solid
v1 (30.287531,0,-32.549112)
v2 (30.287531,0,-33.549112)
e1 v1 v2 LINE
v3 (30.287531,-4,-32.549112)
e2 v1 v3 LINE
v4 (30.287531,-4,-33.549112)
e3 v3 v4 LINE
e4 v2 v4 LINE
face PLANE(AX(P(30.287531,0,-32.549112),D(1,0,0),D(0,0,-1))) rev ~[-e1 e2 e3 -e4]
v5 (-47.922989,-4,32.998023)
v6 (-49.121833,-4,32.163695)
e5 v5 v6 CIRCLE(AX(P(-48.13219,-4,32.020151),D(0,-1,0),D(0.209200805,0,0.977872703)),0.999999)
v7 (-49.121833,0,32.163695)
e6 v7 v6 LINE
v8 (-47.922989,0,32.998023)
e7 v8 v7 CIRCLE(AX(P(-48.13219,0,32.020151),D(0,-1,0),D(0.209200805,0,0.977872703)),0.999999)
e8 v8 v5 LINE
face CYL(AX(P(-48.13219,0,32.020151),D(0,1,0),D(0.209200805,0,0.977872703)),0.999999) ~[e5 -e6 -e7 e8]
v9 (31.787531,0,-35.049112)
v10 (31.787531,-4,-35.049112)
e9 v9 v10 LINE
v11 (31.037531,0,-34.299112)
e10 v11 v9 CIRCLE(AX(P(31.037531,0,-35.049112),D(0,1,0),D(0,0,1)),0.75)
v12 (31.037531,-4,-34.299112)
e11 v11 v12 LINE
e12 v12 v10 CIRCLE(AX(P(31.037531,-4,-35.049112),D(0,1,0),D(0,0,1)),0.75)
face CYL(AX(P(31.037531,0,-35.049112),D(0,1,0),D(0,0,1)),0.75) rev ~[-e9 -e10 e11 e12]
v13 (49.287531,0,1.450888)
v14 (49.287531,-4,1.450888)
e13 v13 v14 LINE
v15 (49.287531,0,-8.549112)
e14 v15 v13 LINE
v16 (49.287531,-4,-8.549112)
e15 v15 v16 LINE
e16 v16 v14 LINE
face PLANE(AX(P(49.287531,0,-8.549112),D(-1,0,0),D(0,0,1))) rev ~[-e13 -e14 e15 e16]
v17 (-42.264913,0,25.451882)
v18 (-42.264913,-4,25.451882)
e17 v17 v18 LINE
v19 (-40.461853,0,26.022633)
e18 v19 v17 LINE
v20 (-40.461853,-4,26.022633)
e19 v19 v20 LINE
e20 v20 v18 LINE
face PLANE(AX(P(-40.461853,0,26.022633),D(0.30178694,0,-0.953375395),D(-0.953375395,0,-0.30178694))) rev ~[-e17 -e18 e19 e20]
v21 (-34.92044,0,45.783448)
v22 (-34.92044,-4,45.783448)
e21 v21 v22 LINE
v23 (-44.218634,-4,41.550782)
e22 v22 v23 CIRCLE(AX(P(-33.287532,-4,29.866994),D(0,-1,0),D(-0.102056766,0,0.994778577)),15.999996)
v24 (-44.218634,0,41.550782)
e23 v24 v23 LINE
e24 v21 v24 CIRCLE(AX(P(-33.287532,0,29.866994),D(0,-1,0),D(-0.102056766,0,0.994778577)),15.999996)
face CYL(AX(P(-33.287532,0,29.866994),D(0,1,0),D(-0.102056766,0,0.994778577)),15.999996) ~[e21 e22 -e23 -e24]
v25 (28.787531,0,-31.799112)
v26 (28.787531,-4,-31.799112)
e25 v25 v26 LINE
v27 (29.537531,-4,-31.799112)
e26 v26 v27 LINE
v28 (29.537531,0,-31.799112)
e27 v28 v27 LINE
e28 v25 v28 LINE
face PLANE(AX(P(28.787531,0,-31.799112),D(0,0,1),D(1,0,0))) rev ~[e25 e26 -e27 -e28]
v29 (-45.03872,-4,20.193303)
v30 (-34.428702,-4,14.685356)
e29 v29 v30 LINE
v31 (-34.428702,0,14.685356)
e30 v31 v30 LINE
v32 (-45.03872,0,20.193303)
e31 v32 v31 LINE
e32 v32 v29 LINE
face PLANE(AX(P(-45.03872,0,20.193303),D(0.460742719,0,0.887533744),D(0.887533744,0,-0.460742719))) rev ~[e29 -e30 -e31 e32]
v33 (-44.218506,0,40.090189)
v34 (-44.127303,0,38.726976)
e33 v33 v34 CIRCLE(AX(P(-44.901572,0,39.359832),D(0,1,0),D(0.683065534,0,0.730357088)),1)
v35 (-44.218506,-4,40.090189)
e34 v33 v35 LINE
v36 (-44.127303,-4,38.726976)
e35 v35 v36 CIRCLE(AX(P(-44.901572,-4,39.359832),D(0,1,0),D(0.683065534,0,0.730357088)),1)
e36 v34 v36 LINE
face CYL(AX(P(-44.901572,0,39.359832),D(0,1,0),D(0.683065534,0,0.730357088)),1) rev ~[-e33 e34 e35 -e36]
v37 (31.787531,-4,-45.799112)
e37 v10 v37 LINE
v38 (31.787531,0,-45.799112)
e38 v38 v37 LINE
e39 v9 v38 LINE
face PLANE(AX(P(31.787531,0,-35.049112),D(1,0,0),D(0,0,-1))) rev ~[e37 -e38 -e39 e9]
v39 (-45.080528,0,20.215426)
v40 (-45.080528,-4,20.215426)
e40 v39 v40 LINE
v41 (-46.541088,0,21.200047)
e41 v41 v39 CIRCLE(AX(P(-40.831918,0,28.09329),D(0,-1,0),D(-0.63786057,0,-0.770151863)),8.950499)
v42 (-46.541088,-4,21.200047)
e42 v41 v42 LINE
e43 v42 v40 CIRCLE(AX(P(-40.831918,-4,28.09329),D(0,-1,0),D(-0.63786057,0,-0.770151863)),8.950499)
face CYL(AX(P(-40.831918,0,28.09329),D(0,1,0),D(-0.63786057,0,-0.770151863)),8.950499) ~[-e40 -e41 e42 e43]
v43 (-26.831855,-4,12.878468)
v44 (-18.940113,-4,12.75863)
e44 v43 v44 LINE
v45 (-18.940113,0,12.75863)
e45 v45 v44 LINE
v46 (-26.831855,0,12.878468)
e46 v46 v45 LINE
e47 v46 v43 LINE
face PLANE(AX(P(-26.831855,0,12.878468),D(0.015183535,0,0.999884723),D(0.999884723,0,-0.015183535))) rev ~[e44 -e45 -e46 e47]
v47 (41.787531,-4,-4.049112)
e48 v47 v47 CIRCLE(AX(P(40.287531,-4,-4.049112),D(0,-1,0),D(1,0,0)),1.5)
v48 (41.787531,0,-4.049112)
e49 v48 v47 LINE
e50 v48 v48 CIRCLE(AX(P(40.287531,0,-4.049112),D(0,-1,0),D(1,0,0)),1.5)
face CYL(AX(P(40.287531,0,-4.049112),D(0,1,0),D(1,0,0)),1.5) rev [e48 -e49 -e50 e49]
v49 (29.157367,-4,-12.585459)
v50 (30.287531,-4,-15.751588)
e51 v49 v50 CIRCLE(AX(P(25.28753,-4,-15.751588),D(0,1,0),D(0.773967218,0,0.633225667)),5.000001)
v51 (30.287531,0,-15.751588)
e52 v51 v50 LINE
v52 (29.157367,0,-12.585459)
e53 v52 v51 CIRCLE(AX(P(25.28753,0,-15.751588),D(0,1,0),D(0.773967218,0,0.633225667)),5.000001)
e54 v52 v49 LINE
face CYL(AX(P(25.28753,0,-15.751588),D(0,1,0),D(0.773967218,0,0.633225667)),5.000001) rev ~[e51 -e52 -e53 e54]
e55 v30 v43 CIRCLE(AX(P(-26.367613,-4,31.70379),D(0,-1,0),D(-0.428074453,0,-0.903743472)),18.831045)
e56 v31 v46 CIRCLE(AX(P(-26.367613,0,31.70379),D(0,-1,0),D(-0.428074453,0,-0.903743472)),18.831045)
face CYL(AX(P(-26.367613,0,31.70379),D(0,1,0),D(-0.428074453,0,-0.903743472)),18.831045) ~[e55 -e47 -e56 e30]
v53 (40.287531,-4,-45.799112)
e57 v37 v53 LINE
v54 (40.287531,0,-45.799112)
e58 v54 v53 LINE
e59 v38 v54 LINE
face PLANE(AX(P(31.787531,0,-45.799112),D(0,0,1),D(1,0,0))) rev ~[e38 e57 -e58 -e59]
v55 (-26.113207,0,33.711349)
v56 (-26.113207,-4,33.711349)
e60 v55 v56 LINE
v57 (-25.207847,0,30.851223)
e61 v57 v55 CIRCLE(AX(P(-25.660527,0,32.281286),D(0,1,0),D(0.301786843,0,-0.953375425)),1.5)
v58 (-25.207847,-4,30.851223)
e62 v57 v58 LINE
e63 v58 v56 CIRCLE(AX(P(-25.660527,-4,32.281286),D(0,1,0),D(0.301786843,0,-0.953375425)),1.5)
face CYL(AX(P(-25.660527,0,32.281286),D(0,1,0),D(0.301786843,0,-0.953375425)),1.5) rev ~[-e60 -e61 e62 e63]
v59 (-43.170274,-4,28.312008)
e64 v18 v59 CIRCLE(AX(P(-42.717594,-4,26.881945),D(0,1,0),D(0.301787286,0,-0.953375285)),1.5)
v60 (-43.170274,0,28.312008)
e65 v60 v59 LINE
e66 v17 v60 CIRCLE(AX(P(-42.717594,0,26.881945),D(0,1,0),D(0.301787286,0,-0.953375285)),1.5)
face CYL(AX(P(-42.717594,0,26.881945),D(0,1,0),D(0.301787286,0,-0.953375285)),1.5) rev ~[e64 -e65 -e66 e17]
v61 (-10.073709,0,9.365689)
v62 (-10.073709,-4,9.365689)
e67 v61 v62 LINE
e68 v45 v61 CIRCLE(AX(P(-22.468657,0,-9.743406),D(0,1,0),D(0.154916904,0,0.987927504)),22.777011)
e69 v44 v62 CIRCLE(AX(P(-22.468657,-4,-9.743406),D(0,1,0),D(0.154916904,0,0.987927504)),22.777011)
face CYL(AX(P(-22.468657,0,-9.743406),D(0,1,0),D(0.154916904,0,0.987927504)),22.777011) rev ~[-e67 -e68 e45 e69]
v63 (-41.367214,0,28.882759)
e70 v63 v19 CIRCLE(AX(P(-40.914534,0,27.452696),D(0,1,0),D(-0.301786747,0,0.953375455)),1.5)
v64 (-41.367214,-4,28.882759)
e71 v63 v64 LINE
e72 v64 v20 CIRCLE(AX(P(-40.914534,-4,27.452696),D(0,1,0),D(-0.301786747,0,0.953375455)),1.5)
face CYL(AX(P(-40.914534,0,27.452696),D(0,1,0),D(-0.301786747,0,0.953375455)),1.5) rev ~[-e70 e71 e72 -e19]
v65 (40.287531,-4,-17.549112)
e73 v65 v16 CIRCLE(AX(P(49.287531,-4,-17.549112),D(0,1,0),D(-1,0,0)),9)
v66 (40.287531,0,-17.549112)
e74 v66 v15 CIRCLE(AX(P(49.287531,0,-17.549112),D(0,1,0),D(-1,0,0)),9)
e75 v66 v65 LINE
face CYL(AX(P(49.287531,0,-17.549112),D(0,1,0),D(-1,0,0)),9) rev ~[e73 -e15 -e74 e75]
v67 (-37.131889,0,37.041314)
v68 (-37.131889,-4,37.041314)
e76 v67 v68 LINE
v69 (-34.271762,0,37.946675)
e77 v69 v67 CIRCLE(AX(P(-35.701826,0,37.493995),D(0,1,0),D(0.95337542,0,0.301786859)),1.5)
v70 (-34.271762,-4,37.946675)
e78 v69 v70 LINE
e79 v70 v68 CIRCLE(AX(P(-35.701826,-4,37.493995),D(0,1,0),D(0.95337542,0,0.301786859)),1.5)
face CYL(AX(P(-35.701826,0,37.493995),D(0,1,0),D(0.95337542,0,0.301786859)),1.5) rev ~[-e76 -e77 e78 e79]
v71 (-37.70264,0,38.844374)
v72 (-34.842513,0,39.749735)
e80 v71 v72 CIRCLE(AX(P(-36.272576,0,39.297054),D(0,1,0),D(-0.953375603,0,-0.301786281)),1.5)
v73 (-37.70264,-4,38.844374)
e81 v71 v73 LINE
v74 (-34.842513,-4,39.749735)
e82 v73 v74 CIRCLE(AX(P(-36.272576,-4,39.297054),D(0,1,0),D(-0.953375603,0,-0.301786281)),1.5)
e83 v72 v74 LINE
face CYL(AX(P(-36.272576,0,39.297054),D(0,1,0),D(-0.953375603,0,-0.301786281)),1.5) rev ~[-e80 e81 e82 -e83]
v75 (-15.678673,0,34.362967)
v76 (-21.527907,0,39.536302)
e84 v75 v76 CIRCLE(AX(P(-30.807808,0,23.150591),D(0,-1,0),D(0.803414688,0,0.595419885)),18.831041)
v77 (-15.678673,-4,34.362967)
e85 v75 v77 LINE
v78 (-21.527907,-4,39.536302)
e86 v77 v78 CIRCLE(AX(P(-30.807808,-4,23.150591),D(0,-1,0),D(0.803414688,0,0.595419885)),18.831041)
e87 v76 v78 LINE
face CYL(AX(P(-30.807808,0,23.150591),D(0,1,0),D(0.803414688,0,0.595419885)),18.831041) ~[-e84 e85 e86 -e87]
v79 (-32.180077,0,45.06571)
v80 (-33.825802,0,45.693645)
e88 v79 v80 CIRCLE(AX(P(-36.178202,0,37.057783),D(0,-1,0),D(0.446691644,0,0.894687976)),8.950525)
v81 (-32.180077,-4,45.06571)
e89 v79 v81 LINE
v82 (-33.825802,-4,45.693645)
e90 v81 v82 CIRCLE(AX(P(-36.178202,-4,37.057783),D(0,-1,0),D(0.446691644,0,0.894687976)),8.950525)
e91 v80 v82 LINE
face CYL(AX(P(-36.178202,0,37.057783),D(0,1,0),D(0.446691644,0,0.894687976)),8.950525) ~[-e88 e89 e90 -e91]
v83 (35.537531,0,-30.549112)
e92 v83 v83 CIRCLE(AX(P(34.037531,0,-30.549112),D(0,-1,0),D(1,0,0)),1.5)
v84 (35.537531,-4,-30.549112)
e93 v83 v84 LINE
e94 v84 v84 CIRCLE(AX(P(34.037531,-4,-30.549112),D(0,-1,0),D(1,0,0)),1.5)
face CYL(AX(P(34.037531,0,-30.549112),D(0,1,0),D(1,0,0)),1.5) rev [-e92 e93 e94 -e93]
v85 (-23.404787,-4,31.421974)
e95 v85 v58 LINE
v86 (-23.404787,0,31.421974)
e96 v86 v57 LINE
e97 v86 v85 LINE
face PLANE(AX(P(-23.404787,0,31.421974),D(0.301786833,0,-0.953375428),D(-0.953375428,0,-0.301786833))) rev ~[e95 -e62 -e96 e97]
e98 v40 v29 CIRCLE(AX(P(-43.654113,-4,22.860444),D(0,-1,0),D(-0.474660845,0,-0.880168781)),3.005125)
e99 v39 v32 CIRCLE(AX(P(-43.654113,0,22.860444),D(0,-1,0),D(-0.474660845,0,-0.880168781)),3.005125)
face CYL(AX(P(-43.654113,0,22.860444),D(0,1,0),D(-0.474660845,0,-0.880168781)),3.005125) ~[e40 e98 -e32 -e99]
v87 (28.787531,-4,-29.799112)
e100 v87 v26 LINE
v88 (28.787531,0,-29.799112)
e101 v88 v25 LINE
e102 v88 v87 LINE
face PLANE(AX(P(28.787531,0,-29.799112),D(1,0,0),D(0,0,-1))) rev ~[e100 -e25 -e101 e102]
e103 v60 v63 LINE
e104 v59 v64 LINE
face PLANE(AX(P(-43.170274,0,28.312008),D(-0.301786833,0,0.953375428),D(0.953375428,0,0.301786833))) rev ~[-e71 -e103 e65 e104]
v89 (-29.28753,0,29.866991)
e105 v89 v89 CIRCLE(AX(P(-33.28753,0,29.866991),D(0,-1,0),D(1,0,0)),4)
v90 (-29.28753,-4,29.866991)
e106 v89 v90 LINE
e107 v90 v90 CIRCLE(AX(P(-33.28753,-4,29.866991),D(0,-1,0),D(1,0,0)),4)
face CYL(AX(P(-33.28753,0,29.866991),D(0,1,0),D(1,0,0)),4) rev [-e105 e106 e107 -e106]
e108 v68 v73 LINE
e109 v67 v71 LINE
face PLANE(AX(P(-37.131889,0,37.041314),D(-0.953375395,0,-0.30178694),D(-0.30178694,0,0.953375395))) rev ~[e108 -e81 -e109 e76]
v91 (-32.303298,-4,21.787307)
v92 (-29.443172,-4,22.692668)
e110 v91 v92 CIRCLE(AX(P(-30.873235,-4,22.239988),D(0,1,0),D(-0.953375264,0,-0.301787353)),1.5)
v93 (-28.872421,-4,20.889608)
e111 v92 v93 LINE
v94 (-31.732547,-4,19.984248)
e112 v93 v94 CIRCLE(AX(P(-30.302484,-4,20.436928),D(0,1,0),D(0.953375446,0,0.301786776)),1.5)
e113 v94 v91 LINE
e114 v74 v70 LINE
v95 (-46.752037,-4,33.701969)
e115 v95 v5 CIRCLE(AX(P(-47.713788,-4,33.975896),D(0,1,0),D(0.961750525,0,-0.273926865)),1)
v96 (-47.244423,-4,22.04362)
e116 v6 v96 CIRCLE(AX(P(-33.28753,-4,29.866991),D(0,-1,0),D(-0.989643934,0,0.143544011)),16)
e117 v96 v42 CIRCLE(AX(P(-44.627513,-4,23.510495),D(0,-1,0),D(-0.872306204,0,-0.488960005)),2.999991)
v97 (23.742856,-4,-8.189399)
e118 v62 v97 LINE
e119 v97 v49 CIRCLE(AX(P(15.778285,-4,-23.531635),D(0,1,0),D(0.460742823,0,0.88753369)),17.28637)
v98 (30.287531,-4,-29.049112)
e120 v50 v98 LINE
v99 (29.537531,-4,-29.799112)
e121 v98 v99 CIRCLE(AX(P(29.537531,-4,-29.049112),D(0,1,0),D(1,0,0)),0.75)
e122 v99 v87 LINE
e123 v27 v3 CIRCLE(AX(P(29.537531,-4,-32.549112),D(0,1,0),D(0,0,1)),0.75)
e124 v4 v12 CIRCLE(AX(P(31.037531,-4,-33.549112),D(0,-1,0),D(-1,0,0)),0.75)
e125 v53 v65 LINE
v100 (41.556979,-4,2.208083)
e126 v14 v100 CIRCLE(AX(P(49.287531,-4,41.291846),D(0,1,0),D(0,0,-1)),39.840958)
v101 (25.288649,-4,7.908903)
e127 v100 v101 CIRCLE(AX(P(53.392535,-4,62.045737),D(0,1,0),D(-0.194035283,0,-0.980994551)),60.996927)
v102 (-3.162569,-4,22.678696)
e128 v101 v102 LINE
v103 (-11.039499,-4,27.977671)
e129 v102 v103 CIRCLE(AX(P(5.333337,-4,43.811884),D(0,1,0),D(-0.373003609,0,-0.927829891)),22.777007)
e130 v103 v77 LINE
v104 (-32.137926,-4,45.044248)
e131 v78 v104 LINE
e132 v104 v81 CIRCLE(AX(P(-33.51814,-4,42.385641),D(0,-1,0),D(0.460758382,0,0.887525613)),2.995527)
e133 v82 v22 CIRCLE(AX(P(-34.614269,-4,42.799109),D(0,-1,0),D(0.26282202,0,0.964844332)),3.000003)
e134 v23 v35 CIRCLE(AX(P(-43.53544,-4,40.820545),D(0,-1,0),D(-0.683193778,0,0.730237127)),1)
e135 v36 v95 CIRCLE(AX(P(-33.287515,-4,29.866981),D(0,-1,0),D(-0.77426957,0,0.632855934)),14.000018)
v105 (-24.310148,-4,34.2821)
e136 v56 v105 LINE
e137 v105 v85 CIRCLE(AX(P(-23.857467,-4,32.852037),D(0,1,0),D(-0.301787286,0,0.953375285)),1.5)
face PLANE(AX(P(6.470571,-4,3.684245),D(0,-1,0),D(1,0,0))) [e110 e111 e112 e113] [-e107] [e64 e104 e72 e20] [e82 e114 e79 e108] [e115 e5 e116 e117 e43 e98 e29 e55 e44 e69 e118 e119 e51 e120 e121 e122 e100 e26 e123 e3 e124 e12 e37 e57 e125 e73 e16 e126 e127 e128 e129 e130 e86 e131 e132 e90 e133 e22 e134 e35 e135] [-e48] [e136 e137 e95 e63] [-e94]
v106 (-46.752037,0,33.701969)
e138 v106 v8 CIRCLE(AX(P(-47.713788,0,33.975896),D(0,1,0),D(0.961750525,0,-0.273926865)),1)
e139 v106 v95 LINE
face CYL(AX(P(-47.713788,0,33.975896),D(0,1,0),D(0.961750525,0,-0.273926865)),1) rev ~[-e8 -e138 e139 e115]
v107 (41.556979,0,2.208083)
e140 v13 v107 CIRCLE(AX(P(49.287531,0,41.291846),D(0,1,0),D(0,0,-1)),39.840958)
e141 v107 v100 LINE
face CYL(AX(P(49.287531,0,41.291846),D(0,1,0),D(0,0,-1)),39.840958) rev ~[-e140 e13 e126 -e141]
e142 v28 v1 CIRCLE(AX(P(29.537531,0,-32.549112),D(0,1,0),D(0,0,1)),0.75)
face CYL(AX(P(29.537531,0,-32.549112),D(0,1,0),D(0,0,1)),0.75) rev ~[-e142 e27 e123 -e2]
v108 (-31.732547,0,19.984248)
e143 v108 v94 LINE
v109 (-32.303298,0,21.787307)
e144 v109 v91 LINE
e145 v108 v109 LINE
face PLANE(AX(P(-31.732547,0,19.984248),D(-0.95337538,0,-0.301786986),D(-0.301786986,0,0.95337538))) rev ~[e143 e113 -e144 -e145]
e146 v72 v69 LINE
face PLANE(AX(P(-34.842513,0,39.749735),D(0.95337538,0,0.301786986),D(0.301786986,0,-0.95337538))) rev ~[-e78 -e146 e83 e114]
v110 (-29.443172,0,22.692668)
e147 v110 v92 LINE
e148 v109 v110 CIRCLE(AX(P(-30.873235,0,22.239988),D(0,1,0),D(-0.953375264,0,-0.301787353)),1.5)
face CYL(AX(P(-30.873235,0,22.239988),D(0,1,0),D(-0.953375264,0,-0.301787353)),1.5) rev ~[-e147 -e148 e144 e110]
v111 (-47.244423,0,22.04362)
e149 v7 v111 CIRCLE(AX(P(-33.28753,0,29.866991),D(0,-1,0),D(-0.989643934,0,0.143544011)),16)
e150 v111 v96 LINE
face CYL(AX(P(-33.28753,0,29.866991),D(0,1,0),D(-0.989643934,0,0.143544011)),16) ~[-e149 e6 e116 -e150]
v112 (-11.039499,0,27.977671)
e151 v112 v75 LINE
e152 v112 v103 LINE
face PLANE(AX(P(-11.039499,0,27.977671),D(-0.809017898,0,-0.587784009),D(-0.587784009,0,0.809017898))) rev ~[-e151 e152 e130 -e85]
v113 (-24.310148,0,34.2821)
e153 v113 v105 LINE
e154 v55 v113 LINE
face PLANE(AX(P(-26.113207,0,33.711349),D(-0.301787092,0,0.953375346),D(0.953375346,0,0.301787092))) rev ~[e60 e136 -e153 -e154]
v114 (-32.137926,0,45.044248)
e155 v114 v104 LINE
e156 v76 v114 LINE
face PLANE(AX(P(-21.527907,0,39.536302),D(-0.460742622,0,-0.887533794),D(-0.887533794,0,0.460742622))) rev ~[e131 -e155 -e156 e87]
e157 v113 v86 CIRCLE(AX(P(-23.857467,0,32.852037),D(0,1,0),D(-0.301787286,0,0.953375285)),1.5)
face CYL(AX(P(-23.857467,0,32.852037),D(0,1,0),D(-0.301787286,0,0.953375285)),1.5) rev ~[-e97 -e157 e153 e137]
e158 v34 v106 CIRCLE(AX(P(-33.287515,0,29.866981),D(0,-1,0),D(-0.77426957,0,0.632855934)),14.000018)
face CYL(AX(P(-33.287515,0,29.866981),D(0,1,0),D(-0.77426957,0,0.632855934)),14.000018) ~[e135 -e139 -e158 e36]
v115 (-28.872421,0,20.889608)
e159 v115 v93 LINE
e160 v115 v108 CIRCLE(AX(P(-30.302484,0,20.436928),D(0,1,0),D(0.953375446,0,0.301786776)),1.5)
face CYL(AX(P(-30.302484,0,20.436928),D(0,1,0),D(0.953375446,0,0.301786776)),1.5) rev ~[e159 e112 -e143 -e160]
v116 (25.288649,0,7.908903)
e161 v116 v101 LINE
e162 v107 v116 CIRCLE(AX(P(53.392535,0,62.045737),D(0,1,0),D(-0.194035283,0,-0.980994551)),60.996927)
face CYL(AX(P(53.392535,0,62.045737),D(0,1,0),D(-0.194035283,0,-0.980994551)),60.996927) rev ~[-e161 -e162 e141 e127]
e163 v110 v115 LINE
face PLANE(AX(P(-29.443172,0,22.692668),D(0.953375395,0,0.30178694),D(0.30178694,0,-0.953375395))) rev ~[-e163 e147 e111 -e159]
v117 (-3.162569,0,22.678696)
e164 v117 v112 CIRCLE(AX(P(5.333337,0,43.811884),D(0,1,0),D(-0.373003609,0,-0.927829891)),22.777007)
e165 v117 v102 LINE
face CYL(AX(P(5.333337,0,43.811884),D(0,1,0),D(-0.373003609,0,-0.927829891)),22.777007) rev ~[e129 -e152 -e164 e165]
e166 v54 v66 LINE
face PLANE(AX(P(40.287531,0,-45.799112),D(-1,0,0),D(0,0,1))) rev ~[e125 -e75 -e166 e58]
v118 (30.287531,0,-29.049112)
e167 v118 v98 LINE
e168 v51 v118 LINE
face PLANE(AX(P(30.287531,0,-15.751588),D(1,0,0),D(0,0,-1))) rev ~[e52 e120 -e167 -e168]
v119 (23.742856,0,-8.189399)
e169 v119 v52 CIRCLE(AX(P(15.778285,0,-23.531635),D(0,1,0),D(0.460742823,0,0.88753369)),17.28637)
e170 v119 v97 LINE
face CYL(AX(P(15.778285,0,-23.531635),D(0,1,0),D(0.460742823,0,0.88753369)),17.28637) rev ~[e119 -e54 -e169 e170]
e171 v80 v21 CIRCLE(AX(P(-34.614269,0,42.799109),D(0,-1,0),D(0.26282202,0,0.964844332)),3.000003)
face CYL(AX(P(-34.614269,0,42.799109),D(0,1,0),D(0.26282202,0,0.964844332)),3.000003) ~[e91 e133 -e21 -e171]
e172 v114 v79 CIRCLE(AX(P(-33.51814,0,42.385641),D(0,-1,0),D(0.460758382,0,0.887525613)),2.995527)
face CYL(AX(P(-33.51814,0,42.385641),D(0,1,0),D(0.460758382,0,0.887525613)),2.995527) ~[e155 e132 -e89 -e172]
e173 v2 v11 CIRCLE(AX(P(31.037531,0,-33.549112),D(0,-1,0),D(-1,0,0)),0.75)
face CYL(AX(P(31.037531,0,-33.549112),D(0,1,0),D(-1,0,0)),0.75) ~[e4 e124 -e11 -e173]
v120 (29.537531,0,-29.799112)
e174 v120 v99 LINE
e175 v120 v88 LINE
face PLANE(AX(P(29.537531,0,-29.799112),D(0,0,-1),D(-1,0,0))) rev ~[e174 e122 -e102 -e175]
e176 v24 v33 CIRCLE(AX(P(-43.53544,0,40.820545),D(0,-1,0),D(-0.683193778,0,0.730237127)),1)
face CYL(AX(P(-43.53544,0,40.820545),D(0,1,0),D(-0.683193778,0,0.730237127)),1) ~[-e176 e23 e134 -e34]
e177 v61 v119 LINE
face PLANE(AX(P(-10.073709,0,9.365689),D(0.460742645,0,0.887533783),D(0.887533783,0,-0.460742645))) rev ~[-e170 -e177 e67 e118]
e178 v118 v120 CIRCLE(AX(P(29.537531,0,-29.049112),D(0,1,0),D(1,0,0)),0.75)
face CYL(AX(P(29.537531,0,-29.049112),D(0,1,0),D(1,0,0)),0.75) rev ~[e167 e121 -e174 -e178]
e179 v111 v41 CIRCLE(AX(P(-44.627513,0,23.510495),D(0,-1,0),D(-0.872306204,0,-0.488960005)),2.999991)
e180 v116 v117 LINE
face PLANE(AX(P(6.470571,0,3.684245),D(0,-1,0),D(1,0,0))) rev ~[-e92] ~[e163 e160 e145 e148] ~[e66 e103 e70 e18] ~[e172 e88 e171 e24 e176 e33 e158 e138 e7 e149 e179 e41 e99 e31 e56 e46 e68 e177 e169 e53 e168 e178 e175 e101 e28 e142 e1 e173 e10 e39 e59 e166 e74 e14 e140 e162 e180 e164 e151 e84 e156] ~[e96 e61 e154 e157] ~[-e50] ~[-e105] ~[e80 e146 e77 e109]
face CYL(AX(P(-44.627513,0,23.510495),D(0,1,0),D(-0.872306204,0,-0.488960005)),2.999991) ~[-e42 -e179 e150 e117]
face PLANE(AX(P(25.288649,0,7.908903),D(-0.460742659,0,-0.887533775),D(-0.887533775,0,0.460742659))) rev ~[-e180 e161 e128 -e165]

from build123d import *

# Parameters (mm, degrees)
F0_R     = 1.5
F0_R_2   = 4
F1_DEPTH = 4


# Not quite as in the source:
# - ends of sketch curves that miss each other by under 0.0002 mm in the source are joined


with BuildPart() as f1:
    # F0 (on Front) → F1 (new body)
    with BuildSketch(Plane.XZ):
        with BuildLine():
            ThreePointArc((-46.7520374748, 33.7019691352), (-47.1985525616, 33.1188473182), (-47.9229891353, 32.9980233677))
            ThreePointArc((-47.9229891353, 32.9980233677), (-48.7034151976, 32.8409436846), (-49.1218329373, 32.1636949909))
            ThreePointArc((-49.1218329373, 32.1636949909), (-49.0191167234, 26.9485703376), (-47.2444231086, 22.0436199391))
            ThreePointArc((-47.2444231086, 22.0436199391), (-46.9316892388, 21.5893722277), (-46.5410881725, 21.2000467918))
            ThreePointArc((-46.5410881725, 21.2000467918), (-45.835088561, 20.6717193883), (-45.0805279455, 20.2154261011))
            ThreePointArc((-45.0805279455, 20.2154261011), (-45.0596673609, 20.2042820611), (-45.0387197194, 20.1933025406))
            Line((-45.0387197194, 20.1933025406), (-34.428702, 14.685356))
            ThreePointArc((-34.428702, 14.685356), (-30.7249663127, 13.3838083991), (-26.831855016, 12.8784683528))
            Line((-26.831855016, 12.8784683528), (-18.940113, 12.75863))
            ThreePointArc((-18.940113, 12.75863), (-14.3281771728, 11.5292251091), (-10.0737090286, 9.3656889559))
            Line((-10.0737090286, 9.3656889559), (23.742856, -8.189399))
            ThreePointArc((23.742856, -8.189399), (26.6741197813, -10.1115239367), (29.157366832, -12.5854591375))
            ThreePointArc((29.157366832, -12.5854591375), (29.9965212655, -14.0706922033), (30.287531, -15.751588))
            Line((30.287531, -15.751588), (30.287531, -29.049112))
            ThreePointArc((30.287531, -29.049112), (30.0678610859, -29.5794420859), (29.537531, -29.799112))
            Line((29.537531, -29.799112), (28.787531, -29.799112))
            Line((28.787531, -29.799112), (28.787531, -31.799112))
            Line((28.787531, -31.799112), (29.537531, -31.799112))
            ThreePointArc((29.537531, -31.799112), (30.0678610859, -32.0187819141), (30.287531, -32.549112))
            Line((30.287531, -32.549112), (30.287531, -33.549112))
            ThreePointArc((30.287531, -33.549112), (30.5072009141, -34.0794420859), (31.037531, -34.299112))
            ThreePointArc((31.037531, -34.299112), (31.5678610859, -34.5187819141), (31.787531, -35.049112))
            Line((31.787531, -35.049112), (31.787531, -45.799112))
            Line((31.787531, -45.799112), (40.287531, -45.799112))
            Line((40.287531, -45.799112), (40.287531, -17.549112))
            ThreePointArc((40.287531, -17.549112), (42.9235699693, -11.1851509693), (49.287531, -8.549112))
            Line((49.287531, -8.549112), (49.287531, 1.450888))
            ThreePointArc((49.287531, 1.450888), (45.4037577728, 1.6406387059), (41.5569790733, 2.2080833707))
            ThreePointArc((41.5569790733, 2.2080833707), (33.2204107171, 4.4808989987), (25.2886487268, 7.9089034738))
            Line((25.2886487268, 7.9089034738), (-3.162569, 22.678696))
            ThreePointArc((-3.162569, 22.678696), (-7.380174163, 24.9132414841), (-11.0394989374, 27.9776710605))
            Line((-11.0394989374, 27.9776710605), (-15.678673, 34.362967))
            ThreePointArc((-15.678673, 34.362967), (-18.332187349, 37.2561568684), (-21.5279068846, 39.5363022038))
            Line((-21.5279068846, 39.5363022038), (-32.137926, 45.044248))
            ThreePointArc((-32.137926, 45.044248), (-32.1589591581, 45.0550621571), (-32.1800770412, 45.0657099174))
            ThreePointArc((-32.1800770412, 45.0657099174), (-32.9874548739, 45.4202604433), (-33.8258020362, 45.693644867))
            ThreePointArc((-33.8258020362, 45.693644867), (-34.3689763365, 45.7890671015), (-34.9204399653, 45.7834476614))
            ThreePointArc((-34.9204399653, 45.7834476614), (-39.9164421929, 44.4291859973), (-44.218633855, 41.550781845))
            ThreePointArc((-44.218633855, 41.550781845), (-44.5354399962, 40.8204576148), (-44.2185063254, 40.090188652))
            ThreePointArc((-44.2185063254, 40.090188652), (-43.903802542, 39.4265860913), (-44.1273026907, 38.7269757472))
            ThreePointArc((-44.1273026907, 38.7269757472), (-45.6966868361, 36.3487212178), (-46.7520374748, 33.7019691352))
        make_face()
        with Locations((34.037531, -30.549112)):
            Circle(F0_R, mode=Mode.SUBTRACT)
        with Locations((40.287531, -4.049112)):
            Circle(F0_R, mode=Mode.SUBTRACT)
        with BuildLine():
            Line((-29.443172, 22.692668), (-28.872421, 20.889608))
            ThreePointArc((-28.872421, 20.889608), (-29.8498040801, 19.0068647531), (-31.7325472924, 19.984248224))
            Line((-31.7325472924, 19.984248224), (-32.303298, 21.787307))
            ThreePointArc((-32.303298, 21.787307), (-31.3259155182, 23.6700510575), (-29.443172, 22.692668))
        make_face(mode=Mode.SUBTRACT)
        with BuildLine():
            Line((-40.461853, 26.022633), (-42.264913, 25.451882))
            ThreePointArc((-42.264913, 25.451882), (-44.1476570575, 26.4292644818), (-43.1702740637, 28.3120082014))
            Line((-43.1702740637, 28.3120082014), (-41.367214, 28.882759))
            ThreePointArc((-41.367214, 28.882759), (-39.4844709425, 27.9053765182), (-40.461853, 26.022633))
        make_face(mode=Mode.SUBTRACT)
        with Locations((-33.28753, 29.866991)):
            Circle(F0_R_2, mode=Mode.SUBTRACT)
        with BuildLine():
            Line((-26.113207, 33.711349), (-24.310148, 34.2821))
            ThreePointArc((-24.310148, 34.2821), (-22.4274039425, 33.3047175182), (-23.4047869363, 31.4219737986))
            Line((-23.4047869363, 31.4219737986), (-25.207847, 30.851223))
            ThreePointArc((-25.207847, 30.851223), (-27.0905902014, 31.8286059363), (-26.113207, 33.711349))
        make_face(mode=Mode.SUBTRACT)
        with BuildLine():
            Line((-37.131889, 37.041314), (-37.70264, 38.844374))
            ThreePointArc((-37.70264, 38.844374), (-36.7252563743, 40.727117103), (-34.8425130864, 39.7497349727))
            Line((-34.8425130864, 39.7497349727), (-34.271762, 37.946675))
            ThreePointArc((-34.271762, 37.946675), (-35.2491456257, 36.063930897), (-37.131889, 37.041314))
        make_face(mode=Mode.SUBTRACT)
    extrude(amount=F1_DEPTH)


solid = f1.part
